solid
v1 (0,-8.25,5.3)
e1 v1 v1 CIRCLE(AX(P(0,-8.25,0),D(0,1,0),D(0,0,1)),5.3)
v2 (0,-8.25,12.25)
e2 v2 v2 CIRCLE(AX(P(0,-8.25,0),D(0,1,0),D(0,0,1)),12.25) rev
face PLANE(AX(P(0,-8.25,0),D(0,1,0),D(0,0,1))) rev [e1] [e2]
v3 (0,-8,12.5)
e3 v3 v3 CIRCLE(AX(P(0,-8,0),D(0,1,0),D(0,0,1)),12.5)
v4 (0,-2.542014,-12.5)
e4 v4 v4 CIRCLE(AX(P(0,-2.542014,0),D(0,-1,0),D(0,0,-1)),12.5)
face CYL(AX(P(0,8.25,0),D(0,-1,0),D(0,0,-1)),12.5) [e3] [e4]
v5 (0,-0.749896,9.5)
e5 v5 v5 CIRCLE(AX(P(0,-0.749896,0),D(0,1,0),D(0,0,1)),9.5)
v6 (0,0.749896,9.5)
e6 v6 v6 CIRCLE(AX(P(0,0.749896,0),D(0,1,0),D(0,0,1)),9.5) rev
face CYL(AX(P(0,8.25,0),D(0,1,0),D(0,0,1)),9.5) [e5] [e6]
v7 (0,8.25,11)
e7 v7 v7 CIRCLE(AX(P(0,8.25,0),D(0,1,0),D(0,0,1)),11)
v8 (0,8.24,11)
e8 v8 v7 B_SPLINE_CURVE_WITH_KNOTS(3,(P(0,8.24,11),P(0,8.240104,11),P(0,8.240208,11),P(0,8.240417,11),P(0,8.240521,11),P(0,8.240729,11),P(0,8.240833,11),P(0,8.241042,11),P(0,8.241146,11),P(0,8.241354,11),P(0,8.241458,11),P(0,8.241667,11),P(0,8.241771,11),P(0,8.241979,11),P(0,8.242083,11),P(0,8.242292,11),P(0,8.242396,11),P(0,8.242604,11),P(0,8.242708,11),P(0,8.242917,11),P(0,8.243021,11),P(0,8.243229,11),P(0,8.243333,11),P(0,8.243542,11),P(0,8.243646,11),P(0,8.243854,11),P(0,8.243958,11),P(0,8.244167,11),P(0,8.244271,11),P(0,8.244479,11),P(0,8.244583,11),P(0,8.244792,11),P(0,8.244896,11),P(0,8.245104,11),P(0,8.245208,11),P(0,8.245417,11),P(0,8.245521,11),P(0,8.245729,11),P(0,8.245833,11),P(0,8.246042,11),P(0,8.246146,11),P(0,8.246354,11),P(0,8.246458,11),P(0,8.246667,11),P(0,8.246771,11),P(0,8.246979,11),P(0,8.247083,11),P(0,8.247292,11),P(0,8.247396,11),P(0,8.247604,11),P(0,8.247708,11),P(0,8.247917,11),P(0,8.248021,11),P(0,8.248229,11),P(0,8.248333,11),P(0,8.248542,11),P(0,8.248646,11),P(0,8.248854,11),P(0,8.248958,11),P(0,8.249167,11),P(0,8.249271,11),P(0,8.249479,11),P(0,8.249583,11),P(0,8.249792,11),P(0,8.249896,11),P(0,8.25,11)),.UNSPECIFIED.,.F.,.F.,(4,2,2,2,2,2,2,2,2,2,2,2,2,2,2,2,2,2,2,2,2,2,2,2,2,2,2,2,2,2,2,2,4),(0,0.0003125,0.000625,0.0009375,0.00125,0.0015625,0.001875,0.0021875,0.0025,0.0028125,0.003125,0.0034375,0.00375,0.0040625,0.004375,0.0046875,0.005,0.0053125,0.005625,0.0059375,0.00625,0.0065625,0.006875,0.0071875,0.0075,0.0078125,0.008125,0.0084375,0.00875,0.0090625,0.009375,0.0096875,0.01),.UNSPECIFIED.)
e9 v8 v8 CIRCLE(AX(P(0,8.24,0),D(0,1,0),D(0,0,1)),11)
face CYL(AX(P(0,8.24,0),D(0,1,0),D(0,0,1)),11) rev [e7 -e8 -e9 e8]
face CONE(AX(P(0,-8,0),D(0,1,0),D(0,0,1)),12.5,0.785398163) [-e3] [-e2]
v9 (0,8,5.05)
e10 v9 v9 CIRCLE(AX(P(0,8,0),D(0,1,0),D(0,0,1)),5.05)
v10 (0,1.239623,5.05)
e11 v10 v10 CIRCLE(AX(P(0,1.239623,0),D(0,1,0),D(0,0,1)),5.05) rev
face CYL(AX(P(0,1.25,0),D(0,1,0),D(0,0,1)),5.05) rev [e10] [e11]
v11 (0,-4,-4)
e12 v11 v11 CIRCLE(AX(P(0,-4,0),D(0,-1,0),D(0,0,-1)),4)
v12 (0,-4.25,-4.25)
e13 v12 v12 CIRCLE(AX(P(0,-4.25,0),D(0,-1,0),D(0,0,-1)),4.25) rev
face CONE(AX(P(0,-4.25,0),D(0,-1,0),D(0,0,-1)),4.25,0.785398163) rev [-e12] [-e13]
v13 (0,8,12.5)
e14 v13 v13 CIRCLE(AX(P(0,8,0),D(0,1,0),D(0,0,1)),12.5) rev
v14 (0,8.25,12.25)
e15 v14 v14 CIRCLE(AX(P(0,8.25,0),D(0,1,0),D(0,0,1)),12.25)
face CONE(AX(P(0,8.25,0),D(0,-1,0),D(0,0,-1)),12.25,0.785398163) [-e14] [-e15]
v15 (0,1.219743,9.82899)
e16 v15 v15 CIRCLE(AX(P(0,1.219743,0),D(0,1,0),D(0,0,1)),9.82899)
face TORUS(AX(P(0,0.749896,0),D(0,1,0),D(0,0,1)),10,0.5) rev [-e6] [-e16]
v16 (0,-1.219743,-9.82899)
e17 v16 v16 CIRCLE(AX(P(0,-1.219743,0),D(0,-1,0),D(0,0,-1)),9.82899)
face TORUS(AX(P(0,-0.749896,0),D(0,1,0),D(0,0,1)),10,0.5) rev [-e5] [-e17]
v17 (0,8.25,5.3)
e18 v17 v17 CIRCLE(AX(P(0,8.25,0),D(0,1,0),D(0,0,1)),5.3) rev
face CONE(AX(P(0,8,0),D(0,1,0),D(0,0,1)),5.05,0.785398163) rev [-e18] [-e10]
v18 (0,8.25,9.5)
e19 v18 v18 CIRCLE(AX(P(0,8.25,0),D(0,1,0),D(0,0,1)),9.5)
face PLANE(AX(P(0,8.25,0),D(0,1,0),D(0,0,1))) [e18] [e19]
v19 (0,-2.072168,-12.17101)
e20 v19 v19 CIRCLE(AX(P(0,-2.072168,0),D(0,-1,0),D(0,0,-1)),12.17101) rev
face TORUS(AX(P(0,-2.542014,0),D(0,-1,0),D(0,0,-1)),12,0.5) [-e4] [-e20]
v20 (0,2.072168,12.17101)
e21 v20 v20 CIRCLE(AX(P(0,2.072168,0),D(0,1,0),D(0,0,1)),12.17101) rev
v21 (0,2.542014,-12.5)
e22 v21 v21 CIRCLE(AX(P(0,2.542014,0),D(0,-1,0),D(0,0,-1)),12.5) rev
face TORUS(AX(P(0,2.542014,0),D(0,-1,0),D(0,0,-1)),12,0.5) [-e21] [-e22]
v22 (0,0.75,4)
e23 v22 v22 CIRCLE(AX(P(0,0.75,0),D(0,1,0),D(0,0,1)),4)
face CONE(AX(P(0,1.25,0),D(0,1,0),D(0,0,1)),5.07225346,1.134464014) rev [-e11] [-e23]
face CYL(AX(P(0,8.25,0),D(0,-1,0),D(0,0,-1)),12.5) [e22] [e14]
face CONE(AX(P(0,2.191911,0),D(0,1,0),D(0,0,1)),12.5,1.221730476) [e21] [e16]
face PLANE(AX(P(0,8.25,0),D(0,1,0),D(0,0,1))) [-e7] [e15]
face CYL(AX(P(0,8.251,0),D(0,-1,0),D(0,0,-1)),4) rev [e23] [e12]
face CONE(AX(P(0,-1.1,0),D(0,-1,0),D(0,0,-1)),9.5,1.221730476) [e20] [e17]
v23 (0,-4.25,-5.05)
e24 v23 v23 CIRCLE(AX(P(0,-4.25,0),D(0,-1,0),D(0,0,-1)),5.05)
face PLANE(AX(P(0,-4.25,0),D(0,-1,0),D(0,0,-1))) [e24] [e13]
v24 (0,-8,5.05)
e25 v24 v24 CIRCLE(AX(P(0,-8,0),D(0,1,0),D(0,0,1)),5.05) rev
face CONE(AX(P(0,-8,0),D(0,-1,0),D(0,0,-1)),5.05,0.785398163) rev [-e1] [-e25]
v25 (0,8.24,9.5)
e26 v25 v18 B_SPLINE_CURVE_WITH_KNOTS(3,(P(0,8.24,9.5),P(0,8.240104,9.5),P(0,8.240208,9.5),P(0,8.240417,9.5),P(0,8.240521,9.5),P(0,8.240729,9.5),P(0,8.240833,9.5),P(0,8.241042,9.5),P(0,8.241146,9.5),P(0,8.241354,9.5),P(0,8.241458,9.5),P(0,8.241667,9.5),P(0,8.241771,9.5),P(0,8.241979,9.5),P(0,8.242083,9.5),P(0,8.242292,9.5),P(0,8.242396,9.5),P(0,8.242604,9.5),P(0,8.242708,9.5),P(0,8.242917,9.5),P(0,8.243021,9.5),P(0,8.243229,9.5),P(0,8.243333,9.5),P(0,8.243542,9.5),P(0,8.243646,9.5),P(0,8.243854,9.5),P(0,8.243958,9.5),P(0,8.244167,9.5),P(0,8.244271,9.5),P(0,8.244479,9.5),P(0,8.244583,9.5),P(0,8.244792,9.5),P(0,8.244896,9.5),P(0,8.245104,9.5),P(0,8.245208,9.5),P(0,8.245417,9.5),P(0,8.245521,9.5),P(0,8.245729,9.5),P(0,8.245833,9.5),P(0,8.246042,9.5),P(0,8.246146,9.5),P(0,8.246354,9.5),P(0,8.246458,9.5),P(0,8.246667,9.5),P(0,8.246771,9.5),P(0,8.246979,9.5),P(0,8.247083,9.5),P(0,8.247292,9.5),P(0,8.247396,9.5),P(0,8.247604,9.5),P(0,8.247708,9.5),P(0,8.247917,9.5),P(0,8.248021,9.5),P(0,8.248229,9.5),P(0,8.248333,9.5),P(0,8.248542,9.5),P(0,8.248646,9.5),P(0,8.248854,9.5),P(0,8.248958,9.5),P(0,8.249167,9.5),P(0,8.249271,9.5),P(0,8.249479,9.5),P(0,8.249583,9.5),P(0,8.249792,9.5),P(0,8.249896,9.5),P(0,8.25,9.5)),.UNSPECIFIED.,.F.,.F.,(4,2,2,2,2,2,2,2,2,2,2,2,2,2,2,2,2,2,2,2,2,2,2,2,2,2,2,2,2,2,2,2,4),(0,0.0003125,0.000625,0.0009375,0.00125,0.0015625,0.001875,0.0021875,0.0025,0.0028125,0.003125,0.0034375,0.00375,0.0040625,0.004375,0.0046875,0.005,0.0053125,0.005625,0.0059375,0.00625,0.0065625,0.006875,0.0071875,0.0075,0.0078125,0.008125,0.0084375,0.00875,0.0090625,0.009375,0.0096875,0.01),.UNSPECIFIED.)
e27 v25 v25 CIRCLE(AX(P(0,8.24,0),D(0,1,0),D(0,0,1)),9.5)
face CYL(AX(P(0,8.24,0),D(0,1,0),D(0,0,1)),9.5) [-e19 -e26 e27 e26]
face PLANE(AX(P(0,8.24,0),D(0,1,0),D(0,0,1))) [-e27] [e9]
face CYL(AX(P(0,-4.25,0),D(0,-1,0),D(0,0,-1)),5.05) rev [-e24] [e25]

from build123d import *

# Parameters (mm, degrees)
SKETCH1_R           = 12.5
BOSS_EXTRUDE1_DEPTH = 8.25
CUT_EXTRUDE1_REACH  = 26.182
SKETCH2_R           = 4
SKETCH11_R          = 5.05
CUT_EXTRUDE5_DEPTH  = 4
CUT_EXTRUDE6_START  = -7
SKETCH12_R          = 5.05
CUT_EXTRUDE6_DEPTH  = 7
SKETCH7_R           = 11
SKETCH7_R_2         = 9.5
CUT_EXTRUDE4_DEPTH  = 0.01
CHAMFER2_SIZE       = 0.5
CHAMFER2_SIZE_2     = 1.07225346
FILLET4_R           = 0.5
CHAMFER1_SIZE       = 0.25


with BuildPart() as part:
    # Sketch1 → Boss-Extrude1 (new, symmetric)
    with BuildSketch(Plane(origin=(0, 0, 0), x_dir=(1, 0, 0), z_dir=(0, 1, 0))):
        with Locations(Location((0, 0, 0), (0, 0, 270))):
            Circle(SKETCH1_R)
    extrude(amount=BOSS_EXTRUDE1_DEPTH, both=True)

    # Sketch2 → Cut-Extrude1 (cut, up to next)
    with BuildSketch(Plane.XZ.offset(8.25), mode=Mode.PRIVATE) as cut_extrude1_sk1:
        with Locations(Location((0, 0, 0), (0, 0, 270))):
            Circle(SKETCH2_R)
    cut_extrude1_tool1 = extrude(cut_extrude1_sk1.sketch, amount=-CUT_EXTRUDE1_REACH, mode=Mode.PRIVATE) & part.part
    add(cut_extrude1_tool1.solids().sort_by_distance((0, -8.25, 0))[0], mode=Mode.SUBTRACT)

    # Sketch11 → Cut-Extrude5 (cut)
    with BuildSketch(Plane.XZ.offset(8.25)):
        with Locations(Location((0, 0, 0), (0, 0, 270))):
            Circle(SKETCH11_R)
    extrude(amount=-CUT_EXTRUDE5_DEPTH, mode=Mode.SUBTRACT)

    # Sketch12 → Cut-Extrude6 (cut)
    with BuildSketch(Plane(origin=(0, 8.25, 0), x_dir=(1, 0, 0), z_dir=(0, 1, 0)).offset(CUT_EXTRUDE6_START)):
        with Locations(Location((0, 0, 0), (0, 0, 90))):
            Circle(SKETCH12_R)
    extrude(amount=CUT_EXTRUDE6_DEPTH, mode=Mode.SUBTRACT)

    # Sketch7 → Cut-Extrude4 (cut)
    with BuildSketch(Plane(origin=(0, 8.25, 0), x_dir=(1, 0, 0), z_dir=(0, 1, 0))):
        with Locations(Location((0, 0, 0), (0, 0, 270))):
            Circle(SKETCH7_R)
        with Locations(Location((0, 0, 0), (0, 0, 270))):
            Circle(SKETCH7_R_2, mode=Mode.SUBTRACT)
    extrude(amount=-CUT_EXTRUDE4_DEPTH, mode=Mode.SUBTRACT)

    # Sketch10 → Cut-Revolve1 (revolve, cut)
    with BuildSketch(Plane.XY, mode=Mode.PRIVATE) as cut_revolve1_sk:
        Polygon((12.5, 2.191910703), (9.5, 1.1), (9.5, -1.1), (12.5, -2.191910703), align=None)
    revolve(cut_revolve1_sk.sketch.rotate(Axis((0, 8.25, 0), (0, -1, 0)), 90), axis=Axis((0, 8.25, 0), (0, -1, 0)), mode=Mode.SUBTRACT)

    # Chamfer2
    # the kernel refuses this chamfer: 1.07225346, 0.5 mm, written as the material it takes off along each edge
    with BuildSketch(Plane(origin=(0, 1.25, 0), x_dir=(0, 0, -1), z_dir=(-1, 0, 0))) as chamfer2_piece_1_section:
        Polygon((4, CHAMFER2_SIZE), (4 + CHAMFER2_SIZE_2, 0), (4, 0), align=None)
    chamfer2_piece_1 = revolve(axis=Axis((0, 1.25, 0), (0, -1, 0)), mode=Mode.PRIVATE)
    chamfer2_piece_1 = chamfer2_piece_1 & Plane(origin=(0, 1.004178962, 0), x_dir=(0, 0, -1), z_dir=(0, -1, 0)) * Cylinder(5.05, 21, mode=Mode.PRIVATE)
    add(chamfer2_piece_1, mode=Mode.SUBTRACT)

    # Fillet4
    fillet4_edges = [part.edges().sort_by_distance(p)[0] for p in [
        (0, -2.191910703, -12.5),
        (0, -1.1, -9.5),
        (0, 1.1, -9.5),
        (0, 2.191910703, -12.5),
    ]]
    fillet(fillet4_edges, radius=FILLET4_R)

    # Chamfer1
    chamfer1_edges = [part.edges().sort_by_distance(p)[0] for p in [
        (0, -8.25, 5.05),
        (0, -4.25, 4),
        (0, 8.25, 5.05),
        (0, -8.25, -12.5),
        (0, 8.25, -12.5),
    ]]
    chamfer(chamfer1_edges, length=CHAMFER1_SIZE)


solid = part.part
